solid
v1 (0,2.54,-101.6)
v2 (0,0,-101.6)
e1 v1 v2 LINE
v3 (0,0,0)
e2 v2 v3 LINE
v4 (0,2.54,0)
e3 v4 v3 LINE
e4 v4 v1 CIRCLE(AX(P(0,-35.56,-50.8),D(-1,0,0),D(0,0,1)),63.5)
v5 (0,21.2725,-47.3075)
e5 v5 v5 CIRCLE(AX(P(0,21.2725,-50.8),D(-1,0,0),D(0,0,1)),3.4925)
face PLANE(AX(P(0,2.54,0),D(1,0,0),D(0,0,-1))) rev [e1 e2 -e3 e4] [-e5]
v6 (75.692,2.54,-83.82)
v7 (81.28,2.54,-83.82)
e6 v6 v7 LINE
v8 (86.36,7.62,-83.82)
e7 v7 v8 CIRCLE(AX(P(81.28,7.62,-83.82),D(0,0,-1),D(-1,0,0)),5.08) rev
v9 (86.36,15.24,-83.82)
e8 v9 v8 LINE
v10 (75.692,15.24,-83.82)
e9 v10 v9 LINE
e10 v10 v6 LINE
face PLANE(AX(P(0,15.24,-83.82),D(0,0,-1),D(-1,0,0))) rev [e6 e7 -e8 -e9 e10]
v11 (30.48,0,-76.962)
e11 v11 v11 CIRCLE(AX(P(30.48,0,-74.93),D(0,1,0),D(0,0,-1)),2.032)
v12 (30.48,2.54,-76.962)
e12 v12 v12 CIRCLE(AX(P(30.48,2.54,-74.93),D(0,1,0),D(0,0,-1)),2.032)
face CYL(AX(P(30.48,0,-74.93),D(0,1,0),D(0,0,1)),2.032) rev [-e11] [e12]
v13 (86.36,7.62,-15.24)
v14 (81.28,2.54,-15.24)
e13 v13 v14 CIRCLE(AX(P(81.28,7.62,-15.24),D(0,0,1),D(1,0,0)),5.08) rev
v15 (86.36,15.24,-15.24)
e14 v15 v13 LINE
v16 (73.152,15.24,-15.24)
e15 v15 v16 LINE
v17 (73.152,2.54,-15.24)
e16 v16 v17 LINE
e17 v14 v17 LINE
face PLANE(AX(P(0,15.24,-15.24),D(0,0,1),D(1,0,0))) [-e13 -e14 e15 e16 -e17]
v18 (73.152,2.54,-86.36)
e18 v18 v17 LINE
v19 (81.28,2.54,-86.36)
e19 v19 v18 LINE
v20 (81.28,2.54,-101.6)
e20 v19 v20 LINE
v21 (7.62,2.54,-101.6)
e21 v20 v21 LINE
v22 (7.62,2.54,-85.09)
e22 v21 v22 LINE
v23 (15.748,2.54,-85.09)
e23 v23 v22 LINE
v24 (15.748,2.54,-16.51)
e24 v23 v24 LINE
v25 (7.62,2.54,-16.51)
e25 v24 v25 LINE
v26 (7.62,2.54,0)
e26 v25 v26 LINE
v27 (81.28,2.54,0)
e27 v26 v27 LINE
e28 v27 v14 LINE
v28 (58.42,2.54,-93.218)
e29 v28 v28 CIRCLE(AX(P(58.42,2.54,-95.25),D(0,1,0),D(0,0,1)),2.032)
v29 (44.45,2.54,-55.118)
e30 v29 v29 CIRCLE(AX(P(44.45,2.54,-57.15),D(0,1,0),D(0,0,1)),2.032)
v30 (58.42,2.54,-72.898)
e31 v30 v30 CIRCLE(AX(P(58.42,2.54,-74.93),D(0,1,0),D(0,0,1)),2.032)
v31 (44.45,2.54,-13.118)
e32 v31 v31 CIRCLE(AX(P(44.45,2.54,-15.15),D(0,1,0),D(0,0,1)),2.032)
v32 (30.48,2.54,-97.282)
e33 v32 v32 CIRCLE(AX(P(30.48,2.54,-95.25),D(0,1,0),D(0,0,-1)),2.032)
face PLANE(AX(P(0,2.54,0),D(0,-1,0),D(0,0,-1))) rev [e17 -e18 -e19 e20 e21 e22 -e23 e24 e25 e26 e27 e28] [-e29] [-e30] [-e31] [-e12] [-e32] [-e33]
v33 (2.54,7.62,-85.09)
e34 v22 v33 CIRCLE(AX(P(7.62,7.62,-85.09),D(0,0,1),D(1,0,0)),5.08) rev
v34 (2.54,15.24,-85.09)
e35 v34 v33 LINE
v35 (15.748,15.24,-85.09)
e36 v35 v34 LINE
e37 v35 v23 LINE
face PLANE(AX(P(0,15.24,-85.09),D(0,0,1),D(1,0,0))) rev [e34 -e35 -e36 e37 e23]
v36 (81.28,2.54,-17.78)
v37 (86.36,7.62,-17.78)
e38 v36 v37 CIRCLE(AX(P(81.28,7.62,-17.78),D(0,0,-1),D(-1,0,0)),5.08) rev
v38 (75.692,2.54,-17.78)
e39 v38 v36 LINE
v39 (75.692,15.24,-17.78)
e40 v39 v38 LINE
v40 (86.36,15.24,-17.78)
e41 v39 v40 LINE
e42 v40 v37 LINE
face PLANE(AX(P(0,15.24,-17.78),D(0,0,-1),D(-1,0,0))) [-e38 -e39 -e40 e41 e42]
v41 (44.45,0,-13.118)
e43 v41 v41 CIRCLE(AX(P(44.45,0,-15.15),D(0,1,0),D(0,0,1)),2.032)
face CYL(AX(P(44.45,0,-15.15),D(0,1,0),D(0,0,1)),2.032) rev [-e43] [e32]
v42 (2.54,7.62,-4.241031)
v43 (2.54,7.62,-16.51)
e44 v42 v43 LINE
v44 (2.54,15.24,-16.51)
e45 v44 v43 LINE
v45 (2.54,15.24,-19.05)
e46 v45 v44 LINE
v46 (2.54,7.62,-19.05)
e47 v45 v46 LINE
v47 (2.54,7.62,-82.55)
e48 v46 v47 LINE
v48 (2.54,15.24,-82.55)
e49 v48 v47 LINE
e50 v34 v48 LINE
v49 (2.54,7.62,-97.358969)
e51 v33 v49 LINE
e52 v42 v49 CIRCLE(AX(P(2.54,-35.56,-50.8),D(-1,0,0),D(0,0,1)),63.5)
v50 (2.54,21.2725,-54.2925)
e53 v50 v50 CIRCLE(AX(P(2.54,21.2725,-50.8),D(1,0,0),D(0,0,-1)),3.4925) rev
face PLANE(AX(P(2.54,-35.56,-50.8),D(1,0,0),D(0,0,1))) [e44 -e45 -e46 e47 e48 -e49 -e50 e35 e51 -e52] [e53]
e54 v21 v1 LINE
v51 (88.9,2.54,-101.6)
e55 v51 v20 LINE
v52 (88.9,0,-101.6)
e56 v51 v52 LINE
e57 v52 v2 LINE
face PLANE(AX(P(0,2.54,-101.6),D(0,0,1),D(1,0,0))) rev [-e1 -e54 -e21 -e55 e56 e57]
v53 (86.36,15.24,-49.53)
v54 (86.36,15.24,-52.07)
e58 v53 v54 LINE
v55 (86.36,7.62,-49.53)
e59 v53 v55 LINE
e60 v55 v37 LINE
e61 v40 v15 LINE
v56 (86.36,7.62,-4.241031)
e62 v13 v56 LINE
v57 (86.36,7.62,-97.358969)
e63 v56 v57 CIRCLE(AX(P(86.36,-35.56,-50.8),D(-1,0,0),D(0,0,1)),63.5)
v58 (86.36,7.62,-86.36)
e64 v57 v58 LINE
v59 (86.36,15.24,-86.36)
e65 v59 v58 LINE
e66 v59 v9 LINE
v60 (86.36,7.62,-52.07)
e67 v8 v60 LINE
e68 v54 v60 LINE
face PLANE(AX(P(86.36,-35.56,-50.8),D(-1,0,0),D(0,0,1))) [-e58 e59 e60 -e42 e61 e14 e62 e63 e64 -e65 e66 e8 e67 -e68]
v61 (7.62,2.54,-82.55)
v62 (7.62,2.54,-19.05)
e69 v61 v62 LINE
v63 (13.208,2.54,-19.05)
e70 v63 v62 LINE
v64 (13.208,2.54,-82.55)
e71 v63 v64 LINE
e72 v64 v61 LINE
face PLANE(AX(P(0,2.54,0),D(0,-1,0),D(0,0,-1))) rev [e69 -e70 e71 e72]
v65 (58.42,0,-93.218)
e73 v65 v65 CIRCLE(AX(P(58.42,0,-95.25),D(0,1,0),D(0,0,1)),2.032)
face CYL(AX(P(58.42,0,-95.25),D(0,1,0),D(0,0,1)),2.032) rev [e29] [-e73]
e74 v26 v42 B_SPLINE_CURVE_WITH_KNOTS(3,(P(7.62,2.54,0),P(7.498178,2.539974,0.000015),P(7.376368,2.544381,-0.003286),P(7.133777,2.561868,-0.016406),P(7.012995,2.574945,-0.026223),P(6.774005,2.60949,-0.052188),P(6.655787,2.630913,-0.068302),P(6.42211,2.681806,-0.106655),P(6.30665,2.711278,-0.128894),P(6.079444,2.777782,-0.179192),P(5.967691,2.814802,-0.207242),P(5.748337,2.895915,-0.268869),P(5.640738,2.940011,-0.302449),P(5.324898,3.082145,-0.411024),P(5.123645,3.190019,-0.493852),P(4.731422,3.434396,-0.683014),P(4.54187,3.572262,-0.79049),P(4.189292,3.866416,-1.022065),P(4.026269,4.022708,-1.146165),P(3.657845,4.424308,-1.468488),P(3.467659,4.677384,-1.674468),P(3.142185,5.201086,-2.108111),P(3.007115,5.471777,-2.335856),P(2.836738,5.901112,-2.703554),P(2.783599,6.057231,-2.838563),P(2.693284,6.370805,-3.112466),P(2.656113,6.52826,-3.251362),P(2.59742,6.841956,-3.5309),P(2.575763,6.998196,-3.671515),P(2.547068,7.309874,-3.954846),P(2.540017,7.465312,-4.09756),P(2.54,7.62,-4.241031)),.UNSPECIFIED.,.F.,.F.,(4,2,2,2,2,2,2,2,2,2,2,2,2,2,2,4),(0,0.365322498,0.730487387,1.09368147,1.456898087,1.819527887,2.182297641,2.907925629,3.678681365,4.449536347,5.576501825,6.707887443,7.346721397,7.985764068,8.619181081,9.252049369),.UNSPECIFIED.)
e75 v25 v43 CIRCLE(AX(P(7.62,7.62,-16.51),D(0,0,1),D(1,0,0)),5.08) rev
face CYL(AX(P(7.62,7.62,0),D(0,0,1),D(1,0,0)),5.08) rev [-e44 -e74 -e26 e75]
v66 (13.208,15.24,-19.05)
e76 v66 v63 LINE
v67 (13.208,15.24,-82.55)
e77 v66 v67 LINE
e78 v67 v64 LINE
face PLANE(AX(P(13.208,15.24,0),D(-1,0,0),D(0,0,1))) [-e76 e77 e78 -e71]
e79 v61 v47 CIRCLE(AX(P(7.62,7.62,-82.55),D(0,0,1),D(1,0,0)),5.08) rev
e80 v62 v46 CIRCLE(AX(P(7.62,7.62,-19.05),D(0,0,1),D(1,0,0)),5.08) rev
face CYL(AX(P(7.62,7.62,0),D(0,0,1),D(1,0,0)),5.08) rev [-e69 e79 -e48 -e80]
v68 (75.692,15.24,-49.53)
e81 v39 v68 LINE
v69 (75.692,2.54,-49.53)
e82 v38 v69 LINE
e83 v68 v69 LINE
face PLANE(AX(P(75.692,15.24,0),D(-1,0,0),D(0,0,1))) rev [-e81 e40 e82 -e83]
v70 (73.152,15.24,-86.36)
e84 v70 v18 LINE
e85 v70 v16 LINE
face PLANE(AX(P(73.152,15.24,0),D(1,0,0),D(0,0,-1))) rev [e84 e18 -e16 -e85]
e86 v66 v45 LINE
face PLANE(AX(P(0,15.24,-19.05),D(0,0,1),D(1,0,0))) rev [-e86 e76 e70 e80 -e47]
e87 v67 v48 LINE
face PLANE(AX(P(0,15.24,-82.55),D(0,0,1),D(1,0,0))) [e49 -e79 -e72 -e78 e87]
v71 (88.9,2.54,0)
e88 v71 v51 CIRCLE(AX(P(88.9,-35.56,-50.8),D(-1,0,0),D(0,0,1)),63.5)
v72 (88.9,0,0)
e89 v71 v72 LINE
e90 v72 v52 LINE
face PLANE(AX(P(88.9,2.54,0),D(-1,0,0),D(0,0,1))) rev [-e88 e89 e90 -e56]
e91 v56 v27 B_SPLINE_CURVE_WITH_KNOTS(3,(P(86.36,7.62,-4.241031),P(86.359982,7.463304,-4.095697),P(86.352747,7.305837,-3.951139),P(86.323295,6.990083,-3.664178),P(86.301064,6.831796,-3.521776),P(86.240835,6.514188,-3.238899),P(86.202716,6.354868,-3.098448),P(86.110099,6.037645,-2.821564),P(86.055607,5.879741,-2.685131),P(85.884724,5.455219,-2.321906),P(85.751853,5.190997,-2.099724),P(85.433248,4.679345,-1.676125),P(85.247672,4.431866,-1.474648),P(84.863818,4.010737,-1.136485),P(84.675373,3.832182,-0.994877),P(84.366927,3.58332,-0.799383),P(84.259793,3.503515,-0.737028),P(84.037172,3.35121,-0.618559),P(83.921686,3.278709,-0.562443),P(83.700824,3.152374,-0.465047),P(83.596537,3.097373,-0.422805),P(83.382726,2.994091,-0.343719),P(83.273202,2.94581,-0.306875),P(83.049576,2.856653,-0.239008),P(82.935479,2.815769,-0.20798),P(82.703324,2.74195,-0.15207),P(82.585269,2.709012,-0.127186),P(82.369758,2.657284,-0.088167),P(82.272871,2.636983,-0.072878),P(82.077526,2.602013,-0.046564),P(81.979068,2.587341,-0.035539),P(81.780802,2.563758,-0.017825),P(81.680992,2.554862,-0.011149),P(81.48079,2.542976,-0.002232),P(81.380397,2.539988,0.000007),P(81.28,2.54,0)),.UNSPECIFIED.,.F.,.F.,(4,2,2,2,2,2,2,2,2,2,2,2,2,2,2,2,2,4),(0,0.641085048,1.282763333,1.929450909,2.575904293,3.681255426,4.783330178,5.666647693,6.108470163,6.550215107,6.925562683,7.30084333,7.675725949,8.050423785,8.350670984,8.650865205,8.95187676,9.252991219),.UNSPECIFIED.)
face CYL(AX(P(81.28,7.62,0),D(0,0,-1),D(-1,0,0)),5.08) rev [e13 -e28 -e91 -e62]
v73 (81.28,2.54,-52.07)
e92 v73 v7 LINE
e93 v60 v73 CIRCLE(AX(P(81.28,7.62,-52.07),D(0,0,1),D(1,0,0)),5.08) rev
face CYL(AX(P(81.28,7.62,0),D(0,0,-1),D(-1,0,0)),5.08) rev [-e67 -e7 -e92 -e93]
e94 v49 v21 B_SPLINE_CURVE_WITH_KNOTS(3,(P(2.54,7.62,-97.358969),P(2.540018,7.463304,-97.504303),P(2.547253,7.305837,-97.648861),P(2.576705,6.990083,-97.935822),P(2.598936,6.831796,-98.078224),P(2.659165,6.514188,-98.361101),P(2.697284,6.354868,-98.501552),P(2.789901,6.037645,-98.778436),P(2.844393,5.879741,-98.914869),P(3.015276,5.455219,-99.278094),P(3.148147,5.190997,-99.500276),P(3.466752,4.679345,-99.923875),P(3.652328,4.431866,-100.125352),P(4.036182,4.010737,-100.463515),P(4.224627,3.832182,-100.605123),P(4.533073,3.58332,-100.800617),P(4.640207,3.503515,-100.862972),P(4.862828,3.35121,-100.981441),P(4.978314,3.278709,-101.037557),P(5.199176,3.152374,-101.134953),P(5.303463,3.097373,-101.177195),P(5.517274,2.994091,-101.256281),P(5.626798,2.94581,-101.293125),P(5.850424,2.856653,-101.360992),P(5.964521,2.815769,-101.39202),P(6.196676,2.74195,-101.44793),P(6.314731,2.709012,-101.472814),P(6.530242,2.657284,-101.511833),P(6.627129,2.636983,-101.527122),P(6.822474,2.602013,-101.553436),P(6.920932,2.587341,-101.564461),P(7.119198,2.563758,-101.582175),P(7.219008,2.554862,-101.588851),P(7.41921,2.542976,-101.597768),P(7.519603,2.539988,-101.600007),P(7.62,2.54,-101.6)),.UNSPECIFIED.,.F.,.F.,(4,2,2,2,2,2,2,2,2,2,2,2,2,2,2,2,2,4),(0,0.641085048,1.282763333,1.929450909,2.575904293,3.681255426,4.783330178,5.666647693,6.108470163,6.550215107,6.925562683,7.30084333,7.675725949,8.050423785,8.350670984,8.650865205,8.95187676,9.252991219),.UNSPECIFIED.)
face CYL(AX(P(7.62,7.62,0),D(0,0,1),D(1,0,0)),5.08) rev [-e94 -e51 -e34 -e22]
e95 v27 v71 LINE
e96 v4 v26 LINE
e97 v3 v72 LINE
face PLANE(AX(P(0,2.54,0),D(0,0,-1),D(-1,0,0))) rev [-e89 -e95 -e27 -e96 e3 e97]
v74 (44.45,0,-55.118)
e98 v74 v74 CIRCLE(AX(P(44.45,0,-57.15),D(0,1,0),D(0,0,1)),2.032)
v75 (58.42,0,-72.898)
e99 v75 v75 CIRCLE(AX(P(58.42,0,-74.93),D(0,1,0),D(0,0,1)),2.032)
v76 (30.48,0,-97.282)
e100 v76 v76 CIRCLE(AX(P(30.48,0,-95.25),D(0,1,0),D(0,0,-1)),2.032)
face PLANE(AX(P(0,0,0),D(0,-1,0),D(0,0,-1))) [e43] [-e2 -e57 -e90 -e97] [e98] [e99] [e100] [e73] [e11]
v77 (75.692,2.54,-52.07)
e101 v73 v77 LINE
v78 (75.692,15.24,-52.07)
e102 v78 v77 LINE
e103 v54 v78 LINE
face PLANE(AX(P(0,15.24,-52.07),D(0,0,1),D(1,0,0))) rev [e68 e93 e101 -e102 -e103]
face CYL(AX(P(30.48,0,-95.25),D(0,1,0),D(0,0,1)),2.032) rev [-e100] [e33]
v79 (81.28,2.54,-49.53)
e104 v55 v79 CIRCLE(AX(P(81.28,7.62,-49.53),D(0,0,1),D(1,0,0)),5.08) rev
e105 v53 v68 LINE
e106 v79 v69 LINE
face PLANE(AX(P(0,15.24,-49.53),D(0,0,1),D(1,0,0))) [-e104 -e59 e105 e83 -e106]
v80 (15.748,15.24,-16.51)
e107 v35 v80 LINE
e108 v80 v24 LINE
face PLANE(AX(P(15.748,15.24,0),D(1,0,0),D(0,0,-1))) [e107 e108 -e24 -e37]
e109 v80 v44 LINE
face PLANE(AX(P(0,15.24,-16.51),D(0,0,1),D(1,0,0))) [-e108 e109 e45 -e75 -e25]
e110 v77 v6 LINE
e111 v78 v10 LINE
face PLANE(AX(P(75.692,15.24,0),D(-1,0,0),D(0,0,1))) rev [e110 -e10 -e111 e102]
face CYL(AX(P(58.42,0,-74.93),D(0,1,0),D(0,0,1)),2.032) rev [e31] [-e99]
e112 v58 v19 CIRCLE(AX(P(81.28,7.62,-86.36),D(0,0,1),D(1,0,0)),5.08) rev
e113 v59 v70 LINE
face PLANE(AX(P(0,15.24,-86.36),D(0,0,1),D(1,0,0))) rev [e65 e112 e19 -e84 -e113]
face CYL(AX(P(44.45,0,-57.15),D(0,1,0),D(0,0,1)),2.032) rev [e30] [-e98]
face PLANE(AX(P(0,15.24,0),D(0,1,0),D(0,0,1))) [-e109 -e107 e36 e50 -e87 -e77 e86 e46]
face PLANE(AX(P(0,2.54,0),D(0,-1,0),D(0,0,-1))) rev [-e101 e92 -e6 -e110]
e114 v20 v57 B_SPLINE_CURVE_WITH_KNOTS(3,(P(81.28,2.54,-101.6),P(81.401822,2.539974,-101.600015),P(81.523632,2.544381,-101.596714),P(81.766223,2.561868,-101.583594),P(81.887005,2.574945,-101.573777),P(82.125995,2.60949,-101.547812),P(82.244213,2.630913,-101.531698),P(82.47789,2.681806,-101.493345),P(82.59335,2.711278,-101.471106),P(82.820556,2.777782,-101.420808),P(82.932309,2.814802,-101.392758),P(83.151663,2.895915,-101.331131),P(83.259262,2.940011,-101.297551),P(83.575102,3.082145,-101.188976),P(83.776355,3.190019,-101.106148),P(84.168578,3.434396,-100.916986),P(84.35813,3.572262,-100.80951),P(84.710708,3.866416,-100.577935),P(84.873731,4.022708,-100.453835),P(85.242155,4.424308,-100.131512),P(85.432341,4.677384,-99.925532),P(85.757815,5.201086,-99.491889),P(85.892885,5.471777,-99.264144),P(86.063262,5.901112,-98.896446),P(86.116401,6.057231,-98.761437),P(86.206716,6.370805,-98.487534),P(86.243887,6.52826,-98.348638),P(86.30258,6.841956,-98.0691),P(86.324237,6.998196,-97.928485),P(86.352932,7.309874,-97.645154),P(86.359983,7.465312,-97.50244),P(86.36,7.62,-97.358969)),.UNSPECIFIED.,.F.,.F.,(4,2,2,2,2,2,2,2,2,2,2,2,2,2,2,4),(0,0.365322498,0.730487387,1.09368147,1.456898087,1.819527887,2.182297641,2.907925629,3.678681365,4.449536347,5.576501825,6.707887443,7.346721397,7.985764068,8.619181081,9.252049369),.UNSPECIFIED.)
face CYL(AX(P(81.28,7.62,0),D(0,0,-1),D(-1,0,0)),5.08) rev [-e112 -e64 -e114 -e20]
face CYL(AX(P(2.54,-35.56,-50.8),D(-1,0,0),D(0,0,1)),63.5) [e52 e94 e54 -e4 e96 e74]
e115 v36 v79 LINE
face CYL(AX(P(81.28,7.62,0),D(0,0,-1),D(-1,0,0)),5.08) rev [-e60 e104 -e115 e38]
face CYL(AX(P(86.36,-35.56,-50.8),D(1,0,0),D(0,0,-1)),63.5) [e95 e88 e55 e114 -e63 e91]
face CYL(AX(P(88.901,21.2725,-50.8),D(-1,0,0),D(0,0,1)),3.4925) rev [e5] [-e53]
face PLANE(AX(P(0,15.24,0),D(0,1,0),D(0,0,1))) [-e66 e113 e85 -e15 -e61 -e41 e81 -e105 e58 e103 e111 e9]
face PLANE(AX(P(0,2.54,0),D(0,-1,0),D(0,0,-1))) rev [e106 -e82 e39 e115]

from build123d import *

# Parameters (mm, degrees)
SKETCH1_W           = 88.9
SKETCH1_H           = 101.6
BASE_EXTRUDE_DEPTH  = 2.54
WALL_EXTRUDE_DEPTH  = 2.54
CUT_EXTRUDE1_REACH  = 139.864
SKETCH3_R           = 3.4925
FILLET2_R           = 5.08
SKETCH4_R           = 2.032
CUT_EXTRUDE2_DEPTH  = 138.371503752
SKETCH5_W           = 2.54
SKETCH5_H           = 2.54
SKETCH5_W_2         = 5.08
SKETCH5_W_3         = 5.588
BOSS_EXTRUDE1_DEPTH = 12.7


with BuildPart() as part:
    # Sketch1 → Base Extrude (new body)
    with BuildSketch(Plane(origin=(0, 0, 0), x_dir=(1, 0, 0), z_dir=(0, 1, 0))):
        with Locations((44.45, 50.8)):
            Rectangle(SKETCH1_W, SKETCH1_H)
    extrude(amount=BASE_EXTRUDE_DEPTH)

    # Sketch2 → Wall Extrude (add)
    with BuildSketch(Plane(origin=(88.9, 0, 0), x_dir=(0, 0, -1), z_dir=(1, 0, 0))):
        with BuildLine():
            Line((101.6, 2.54), (101.6, 0))
            Line((101.6, 0), (0, 0))
            Line((0, 0), (0, 2.54))
            ThreePointArc((0, 2.54), (50.8, 27.94), (101.6, 2.54))
        make_face()
    wall_extrude = extrude(amount=-WALL_EXTRUDE_DEPTH)

    # Wall Mirror: Wall Extrude across plane
    add(wall_extrude.mirror(Plane(origin=(44.45, 0, 0), x_dir=(0, 0, 1), z_dir=(1, 0, 0))))

    # Sketch3 → Cut-Extrude1 (cut, up to next)
    with BuildSketch(Plane.ZY, mode=Mode.PRIVATE) as cut_extrude1_sk1:
        with Locations((-50.8, 21.2725)):
            Circle(SKETCH3_R)
    cut_extrude1_tool1 = extrude(cut_extrude1_sk1.sketch, amount=-CUT_EXTRUDE1_REACH, mode=Mode.PRIVATE) & part.part
    add(cut_extrude1_tool1.solids().sort_by_distance((0, 21.2725, -50.8))[0], mode=Mode.SUBTRACT)

    # Fillet2
    # the kernel refuses this fillet: 5.08 mm, written as the material it adds along each edge
    with BuildSketch(Plane(origin=(86.36, 2.54, -101.6), x_dir=(-1, 0, 0), z_dir=(0, 0, 1))) as fillet2_piece_1_section:
        with BuildLine():
            CenterArc((FILLET2_R, -FILLET2_R), FILLET2_R, 90, 90)
            Line((0, -FILLET2_R), (0, 0))
            Line((0, 0), (FILLET2_R, 0))
        make_face()
    fillet2_piece_1 = extrude(amount=101.6, mode=Mode.PRIVATE)
    fillet2_piece_1 = fillet2_piece_1 & Plane(origin=(85.198656014, -35.56, -50.8), x_dir=(0, 0.6000000000000003, 0.7999999999999998), z_dir=(1, 0, 0)) * Cylinder(63.5, 224, mode=Mode.PRIVATE)
    add(fillet2_piece_1)
    with BuildSketch(Plane(origin=(2.54, 2.54, -101.6), x_dir=(1, 0, 0), z_dir=(0, 0, 1))) as fillet2_piece_2_section:
        with BuildLine():
            CenterArc((FILLET2_R, FILLET2_R), FILLET2_R, 180, 90)
            Line((0, FILLET2_R), (0, 0))
            Line((0, 0), (FILLET2_R, 0))
        make_face()
    fillet2_piece_2 = extrude(amount=101.6, mode=Mode.PRIVATE)
    fillet2_piece_2 = fillet2_piece_2 & Plane(origin=(3.701343986, -35.56, -50.8), x_dir=(0, 0.6000000000000003, 0.7999999999999998), z_dir=(-1, 0, 0)) * Cylinder(63.5, 224, mode=Mode.PRIVATE)
    add(fillet2_piece_2)

    # Sketch4 → Cut-Extrude2 (cut, through all)
    with BuildSketch(Plane(origin=(0, 2.54, 0), x_dir=(1, 0, 0), z_dir=(0, 1, 0))):
        with Locations(Location((44.45, 57.15, 0), (0, 0, 270))):
            Circle(SKETCH4_R)
        with Locations(Location((44.45, 15.15, 0), (0, 0, 270))):
            Circle(SKETCH4_R)
        with Locations(Location((58.42, 74.93, 0), (0, 0, 270))):
            Circle(SKETCH4_R)
        with Locations(Location((58.42, 95.25, 0), (0, 0, 270))):
            Circle(SKETCH4_R)
        with Locations(Location((30.48, 74.93, 0), (0, 0, 90))):
            Circle(SKETCH4_R)
        with Locations(Location((30.48, 95.25, 0), (0, 0, 90))):
            Circle(SKETCH4_R)
    extrude(amount=-CUT_EXTRUDE2_DEPTH, mode=Mode.SUBTRACT)

    # Sketch5 → Boss-Extrude1 (add)
    with BuildSketch(Plane(origin=(0, 2.54, 0), x_dir=(1, 0, 0), z_dir=(0, 1, 0))):
        with Locations((87.63, 50.8)):
            Rectangle(SKETCH5_W, SKETCH5_H)
        Polygon((13.208, 82.55), (13.208, 19.05), (7.62, 19.05), (7.62, 16.51), (15.748, 16.51), (15.748, 85.09), (7.62, 85.09), (7.62, 82.55), align=None)
        with Locations((5.08, 17.78)):
            Rectangle(SKETCH5_W_2, SKETCH5_H)
        with Locations((5.08, 83.82)):
            Rectangle(SKETCH5_W_2, SKETCH5_H)
        Polygon((81.28, 83.82), (81.28, 86.36), (73.152, 86.36), (73.152, 52.07), (75.692, 52.07), (75.692, 83.82), align=None)
        Polygon((75.692, 49.53), (73.152, 49.53), (73.152, 15.24), (81.28, 15.24), (81.28, 17.78), (75.692, 17.78), align=None)
        with Locations((83.82, 50.8)):
            Rectangle(SKETCH5_W_2, SKETCH5_H)
        with Locations((78.486, 50.8)):
            Rectangle(SKETCH5_W_3, SKETCH5_H)
        with Locations((74.422, 50.8)):
            Rectangle(SKETCH5_W, SKETCH5_H)
        with Locations((83.82, 85.09)):
            Rectangle(SKETCH5_W_2, SKETCH5_H)
        with Locations((83.82, 16.51)):
            Rectangle(SKETCH5_W_2, SKETCH5_H)
    extrude(amount=BOSS_EXTRUDE1_DEPTH)


solid = part.part
